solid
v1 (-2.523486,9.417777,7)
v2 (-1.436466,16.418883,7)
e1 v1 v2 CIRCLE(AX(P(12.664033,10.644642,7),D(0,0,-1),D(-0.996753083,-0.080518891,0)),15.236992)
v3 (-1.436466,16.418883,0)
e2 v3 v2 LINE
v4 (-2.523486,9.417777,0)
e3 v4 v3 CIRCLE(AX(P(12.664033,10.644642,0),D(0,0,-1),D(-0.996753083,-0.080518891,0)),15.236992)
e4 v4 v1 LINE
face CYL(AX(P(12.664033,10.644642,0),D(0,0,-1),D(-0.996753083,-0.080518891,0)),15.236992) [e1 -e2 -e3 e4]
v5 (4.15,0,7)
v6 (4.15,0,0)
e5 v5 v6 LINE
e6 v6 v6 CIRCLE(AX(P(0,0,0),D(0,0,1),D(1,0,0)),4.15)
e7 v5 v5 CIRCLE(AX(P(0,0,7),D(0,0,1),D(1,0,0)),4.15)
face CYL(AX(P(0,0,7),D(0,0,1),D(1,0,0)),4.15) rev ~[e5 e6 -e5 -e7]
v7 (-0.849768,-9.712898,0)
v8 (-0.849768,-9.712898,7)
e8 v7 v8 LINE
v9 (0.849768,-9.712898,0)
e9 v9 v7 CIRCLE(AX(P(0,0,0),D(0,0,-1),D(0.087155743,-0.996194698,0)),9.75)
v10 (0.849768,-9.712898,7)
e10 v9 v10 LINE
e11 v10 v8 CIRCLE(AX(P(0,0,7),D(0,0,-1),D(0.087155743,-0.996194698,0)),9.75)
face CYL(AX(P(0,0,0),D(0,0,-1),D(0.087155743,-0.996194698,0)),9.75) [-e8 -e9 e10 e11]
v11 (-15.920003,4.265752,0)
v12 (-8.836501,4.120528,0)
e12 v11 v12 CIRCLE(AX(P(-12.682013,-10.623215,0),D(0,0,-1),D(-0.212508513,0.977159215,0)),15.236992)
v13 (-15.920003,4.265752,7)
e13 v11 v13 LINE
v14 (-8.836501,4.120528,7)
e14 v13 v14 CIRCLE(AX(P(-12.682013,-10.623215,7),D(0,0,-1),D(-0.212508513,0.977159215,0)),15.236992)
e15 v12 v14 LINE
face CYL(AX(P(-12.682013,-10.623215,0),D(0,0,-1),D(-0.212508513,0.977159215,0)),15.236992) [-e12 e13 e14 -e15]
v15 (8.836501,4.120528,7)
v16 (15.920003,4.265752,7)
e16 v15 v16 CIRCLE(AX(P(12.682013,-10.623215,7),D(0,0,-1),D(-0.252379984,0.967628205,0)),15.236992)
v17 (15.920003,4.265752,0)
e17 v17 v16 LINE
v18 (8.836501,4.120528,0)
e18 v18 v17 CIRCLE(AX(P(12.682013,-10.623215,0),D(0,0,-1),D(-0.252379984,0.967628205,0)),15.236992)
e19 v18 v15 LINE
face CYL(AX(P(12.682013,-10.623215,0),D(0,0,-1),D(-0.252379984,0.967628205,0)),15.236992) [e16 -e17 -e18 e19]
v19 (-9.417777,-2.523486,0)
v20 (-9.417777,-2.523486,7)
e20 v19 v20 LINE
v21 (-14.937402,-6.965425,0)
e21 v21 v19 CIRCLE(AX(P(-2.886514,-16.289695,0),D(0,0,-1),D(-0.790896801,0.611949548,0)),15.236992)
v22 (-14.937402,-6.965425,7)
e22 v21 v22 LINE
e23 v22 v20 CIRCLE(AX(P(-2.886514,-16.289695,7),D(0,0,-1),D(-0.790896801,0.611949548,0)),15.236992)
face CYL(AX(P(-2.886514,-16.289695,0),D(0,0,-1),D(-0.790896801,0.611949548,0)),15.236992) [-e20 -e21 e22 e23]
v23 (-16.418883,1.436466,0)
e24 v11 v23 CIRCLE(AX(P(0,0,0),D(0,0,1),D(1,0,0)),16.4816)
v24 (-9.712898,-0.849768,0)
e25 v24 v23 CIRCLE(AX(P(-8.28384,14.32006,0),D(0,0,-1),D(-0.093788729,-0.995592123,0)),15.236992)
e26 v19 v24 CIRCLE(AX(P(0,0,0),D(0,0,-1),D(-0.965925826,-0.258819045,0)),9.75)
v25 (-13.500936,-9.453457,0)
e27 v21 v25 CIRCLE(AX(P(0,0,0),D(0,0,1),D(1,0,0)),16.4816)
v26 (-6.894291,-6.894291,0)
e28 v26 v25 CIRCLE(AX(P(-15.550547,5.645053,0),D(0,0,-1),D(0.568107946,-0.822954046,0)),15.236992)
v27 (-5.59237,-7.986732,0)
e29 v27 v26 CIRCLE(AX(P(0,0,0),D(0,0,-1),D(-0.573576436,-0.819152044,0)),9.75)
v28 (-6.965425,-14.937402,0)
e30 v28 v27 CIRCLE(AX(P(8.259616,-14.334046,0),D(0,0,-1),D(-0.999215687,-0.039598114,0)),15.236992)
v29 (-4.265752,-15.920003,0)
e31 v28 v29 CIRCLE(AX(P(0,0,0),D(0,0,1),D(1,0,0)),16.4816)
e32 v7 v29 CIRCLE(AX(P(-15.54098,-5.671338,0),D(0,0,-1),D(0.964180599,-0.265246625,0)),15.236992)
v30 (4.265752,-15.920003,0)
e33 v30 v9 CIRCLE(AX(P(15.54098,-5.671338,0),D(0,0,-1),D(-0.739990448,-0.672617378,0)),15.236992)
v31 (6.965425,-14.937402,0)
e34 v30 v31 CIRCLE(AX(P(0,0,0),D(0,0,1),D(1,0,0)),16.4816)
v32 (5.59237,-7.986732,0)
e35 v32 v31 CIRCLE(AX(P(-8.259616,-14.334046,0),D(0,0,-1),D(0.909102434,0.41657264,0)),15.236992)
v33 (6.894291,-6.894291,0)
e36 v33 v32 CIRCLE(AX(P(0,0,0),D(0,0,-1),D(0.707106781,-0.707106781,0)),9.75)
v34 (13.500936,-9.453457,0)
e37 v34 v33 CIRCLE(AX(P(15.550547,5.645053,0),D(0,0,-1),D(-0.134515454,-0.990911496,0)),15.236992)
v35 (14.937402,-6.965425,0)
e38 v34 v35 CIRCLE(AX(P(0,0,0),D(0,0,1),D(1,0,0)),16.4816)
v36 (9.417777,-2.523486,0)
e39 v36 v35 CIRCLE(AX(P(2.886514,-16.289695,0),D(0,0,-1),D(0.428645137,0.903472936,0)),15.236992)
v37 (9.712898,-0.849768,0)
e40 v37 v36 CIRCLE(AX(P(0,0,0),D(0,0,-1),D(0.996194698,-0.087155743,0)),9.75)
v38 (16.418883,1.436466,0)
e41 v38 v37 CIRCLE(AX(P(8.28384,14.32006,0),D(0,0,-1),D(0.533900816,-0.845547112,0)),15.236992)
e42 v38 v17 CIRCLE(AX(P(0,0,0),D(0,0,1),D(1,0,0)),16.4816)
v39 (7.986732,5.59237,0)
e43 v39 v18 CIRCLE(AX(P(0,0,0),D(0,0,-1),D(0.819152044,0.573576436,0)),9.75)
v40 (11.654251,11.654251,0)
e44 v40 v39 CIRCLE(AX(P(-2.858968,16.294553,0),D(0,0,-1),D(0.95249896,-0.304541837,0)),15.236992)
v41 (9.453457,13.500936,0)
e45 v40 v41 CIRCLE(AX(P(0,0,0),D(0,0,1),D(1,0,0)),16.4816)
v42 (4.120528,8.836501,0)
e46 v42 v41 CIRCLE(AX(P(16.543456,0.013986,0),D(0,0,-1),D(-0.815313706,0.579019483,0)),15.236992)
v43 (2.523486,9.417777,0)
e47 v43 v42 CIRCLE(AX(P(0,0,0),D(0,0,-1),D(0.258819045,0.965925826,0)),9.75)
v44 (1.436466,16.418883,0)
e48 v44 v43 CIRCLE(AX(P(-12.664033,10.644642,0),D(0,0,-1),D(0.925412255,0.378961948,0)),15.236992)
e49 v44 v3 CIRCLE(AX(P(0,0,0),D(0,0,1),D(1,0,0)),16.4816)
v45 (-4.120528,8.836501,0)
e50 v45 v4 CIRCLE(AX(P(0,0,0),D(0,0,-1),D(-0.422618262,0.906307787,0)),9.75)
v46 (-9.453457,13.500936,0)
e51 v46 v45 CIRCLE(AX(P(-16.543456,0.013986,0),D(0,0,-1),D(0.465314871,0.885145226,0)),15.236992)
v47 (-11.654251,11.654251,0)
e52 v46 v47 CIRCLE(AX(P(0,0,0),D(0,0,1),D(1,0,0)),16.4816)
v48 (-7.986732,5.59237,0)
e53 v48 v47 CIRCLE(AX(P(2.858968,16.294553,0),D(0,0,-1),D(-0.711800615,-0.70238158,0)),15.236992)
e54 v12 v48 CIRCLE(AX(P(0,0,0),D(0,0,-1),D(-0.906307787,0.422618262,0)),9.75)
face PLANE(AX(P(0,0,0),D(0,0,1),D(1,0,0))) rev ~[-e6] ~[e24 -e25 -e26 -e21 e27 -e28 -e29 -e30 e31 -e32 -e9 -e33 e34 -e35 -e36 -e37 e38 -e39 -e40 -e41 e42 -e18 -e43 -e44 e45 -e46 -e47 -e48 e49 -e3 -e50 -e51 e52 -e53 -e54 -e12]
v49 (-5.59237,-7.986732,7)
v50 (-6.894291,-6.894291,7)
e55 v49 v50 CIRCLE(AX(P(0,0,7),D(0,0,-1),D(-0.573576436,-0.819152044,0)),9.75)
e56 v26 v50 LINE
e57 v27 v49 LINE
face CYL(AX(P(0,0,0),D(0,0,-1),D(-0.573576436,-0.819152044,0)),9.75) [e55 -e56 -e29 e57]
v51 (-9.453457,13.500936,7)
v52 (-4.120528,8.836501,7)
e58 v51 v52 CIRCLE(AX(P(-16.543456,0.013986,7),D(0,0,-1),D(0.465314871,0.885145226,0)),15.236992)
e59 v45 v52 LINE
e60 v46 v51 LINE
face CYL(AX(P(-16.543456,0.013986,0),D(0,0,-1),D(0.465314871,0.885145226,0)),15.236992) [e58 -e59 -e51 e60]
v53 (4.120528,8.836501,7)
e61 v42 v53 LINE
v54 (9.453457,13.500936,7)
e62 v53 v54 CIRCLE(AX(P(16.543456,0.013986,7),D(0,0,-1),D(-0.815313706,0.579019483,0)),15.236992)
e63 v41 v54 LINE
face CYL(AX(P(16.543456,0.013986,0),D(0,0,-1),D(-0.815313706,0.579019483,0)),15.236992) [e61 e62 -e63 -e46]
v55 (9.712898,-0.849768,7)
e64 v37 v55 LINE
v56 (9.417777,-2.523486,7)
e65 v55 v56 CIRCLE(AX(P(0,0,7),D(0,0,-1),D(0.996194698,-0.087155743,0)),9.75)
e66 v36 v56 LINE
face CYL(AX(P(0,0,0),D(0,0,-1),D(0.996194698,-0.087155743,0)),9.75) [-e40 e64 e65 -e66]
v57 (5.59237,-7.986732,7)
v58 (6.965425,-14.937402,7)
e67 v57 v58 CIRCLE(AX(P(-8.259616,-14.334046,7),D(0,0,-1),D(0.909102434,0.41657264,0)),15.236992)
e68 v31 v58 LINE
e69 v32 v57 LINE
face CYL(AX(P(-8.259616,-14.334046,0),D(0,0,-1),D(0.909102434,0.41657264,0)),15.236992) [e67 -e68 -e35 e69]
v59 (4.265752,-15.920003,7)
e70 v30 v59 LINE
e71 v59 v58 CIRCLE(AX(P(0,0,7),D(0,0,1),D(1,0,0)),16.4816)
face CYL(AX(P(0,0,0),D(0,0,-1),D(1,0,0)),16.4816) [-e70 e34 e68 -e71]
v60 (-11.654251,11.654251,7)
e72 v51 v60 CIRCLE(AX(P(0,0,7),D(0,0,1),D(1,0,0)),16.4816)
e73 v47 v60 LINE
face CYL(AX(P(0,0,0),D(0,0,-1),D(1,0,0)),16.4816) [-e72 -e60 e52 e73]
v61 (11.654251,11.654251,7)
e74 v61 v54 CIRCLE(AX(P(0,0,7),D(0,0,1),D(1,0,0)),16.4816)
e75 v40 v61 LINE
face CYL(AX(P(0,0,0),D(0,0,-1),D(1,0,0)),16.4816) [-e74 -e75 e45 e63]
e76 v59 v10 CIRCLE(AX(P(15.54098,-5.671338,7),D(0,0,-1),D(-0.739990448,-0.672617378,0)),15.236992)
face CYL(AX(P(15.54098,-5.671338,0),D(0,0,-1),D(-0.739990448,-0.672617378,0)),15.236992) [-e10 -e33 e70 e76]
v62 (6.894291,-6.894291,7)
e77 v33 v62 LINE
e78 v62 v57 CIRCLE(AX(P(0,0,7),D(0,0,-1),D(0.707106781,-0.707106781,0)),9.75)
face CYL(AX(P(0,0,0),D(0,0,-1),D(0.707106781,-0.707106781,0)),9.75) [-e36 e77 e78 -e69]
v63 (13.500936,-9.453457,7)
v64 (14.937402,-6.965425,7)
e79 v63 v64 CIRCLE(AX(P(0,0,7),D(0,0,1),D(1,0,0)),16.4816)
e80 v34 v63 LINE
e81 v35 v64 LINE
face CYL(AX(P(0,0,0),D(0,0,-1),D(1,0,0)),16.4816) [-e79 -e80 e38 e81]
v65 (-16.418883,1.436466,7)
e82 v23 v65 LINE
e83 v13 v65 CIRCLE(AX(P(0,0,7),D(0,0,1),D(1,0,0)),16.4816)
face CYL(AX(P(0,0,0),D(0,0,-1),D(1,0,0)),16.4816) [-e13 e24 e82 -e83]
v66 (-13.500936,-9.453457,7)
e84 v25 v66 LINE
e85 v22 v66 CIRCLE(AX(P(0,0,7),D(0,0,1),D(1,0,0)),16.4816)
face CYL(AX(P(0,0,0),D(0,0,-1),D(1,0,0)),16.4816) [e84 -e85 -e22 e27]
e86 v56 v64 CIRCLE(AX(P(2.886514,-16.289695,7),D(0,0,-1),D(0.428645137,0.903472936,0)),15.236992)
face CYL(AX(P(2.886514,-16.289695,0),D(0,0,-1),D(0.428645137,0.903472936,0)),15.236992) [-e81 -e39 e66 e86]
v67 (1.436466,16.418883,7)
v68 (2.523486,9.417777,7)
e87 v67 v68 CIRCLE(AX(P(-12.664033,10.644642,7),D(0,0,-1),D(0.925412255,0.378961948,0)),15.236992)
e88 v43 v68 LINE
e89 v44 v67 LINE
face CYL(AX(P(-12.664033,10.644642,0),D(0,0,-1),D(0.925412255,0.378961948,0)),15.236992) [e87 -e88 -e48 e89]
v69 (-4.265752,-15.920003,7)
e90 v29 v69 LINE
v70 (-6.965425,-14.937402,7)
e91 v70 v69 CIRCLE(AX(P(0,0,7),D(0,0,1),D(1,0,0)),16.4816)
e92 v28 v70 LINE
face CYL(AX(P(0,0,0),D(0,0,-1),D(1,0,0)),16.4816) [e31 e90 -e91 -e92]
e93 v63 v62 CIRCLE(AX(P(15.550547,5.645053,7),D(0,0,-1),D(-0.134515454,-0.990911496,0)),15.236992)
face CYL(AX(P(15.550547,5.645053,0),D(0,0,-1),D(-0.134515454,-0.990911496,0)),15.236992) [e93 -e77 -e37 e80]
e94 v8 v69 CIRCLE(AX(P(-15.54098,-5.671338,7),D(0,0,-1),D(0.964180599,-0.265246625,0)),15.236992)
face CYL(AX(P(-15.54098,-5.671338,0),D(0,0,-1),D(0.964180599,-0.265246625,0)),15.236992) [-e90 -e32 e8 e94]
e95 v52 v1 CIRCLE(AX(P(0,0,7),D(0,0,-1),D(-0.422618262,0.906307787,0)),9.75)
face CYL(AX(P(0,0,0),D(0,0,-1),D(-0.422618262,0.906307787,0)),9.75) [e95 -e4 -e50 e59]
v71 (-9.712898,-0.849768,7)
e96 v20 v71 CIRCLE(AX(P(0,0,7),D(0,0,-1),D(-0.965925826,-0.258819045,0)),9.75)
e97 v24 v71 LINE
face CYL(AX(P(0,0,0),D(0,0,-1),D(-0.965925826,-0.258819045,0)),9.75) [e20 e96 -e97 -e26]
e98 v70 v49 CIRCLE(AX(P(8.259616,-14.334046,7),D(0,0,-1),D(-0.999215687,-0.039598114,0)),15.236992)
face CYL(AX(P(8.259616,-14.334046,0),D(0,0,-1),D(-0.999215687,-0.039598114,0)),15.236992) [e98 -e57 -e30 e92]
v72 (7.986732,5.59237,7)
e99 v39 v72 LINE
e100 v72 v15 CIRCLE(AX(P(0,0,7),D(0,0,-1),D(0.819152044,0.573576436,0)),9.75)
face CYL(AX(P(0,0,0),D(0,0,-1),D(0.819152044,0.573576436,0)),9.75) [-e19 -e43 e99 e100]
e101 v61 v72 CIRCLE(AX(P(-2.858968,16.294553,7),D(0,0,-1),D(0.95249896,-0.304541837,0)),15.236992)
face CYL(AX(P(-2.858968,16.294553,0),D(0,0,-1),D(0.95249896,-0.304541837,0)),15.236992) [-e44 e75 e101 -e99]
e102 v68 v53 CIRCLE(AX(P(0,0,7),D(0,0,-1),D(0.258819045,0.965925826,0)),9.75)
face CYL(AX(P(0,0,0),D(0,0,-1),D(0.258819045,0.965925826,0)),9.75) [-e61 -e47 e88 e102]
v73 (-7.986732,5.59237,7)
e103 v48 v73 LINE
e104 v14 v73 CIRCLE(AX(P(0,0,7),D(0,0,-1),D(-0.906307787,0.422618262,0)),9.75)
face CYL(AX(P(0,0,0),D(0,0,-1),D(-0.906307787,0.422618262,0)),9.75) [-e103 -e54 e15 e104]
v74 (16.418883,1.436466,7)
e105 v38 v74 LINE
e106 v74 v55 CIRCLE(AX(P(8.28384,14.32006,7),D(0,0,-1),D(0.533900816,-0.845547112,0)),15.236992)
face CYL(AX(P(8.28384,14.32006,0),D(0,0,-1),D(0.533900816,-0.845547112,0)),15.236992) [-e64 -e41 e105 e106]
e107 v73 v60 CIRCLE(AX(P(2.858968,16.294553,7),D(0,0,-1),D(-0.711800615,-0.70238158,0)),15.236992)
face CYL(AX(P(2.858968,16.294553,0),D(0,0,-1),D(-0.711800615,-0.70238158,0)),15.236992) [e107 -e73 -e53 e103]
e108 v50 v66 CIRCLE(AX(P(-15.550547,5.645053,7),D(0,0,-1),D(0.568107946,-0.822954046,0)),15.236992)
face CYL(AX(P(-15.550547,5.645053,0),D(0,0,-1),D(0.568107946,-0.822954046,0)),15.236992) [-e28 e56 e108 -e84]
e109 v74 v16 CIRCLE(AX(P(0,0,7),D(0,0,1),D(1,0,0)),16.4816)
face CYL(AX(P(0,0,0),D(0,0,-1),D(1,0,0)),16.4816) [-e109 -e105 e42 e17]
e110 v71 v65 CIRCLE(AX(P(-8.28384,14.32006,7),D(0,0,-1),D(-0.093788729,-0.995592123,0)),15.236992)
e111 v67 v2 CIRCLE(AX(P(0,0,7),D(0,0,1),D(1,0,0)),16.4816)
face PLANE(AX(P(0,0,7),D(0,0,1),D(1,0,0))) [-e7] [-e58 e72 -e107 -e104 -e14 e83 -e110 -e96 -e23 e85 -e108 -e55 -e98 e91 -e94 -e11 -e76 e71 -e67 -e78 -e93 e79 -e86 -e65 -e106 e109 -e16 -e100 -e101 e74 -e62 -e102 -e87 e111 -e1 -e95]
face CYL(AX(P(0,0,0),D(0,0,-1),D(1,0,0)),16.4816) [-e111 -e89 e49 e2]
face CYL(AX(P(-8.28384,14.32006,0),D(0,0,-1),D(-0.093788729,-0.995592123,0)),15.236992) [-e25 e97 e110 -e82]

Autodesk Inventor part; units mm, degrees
sketch "Sketch1" plane through (0, 0, 0) normal (0, 0, 1) x (1, 0, 0)
  circle A0 centre (0, 0) radius 16.4816
  dimension "d0" = 32.9631
extrude "Extrusion1" add sketch "Sketch1" along normal blind 7
ref_plane "Work Plane2" through (0, 0, 3.5) normal (0, 0, 1) x (1, 0, 0)
sketch "Sketch2" plane through (0, 0, 0) normal (0, 0, -1) x (-1, 0, 0)
  circle A0 centre (0, 0) radius 16.4816 projected
  circle A1 centre (0, 0) radius 13.5
  dimension "d3" = 27
surface extrude "Pitch Diameter" sketch "Sketch2" against normal through all shown no curves A1
ref_plane "Work Plane8" through (0, 0, 0) normal (0.9396926, 0.3420201, 0) x (0, 0, 1)
ref_plane "Work Plane9" through (0, 0, 0) normal (1, 0, 0) x (0, 1, 0)
spur gear teeth "Spur Gear" teeth 9 pitch diameter 27 tip diameter 32.9632 root diameter 19.5 face width 7 start plane through (0, 0, 0) normal (0, 0, -1) x (-1, 0, 0)
sketch "Sketch3" plane through (0, 0, 7) normal (0, 0, 1) x (1, 0, 0)
  point P0 (0, 0)
sketch "Sketch4" plane through (0, 0, 7) normal (0, 0, 1) x (1, 0, 0)
  circle A0 centre (0, 0) radius 4.15
  dimension "d49" = 8.3
extrude "Extrusion2" cut sketch "Sketch4" against normal blind 10
equation "\"d0\" = da_da"
equation "\"d1\" = da_b"
equation "\"d3\" = da_d"
equation "\"da_da\" = 32.963154"
equation "\"da_b\" = 7"
equation "\"da_d\" = 27"
properties part number "Spur Gear1" material "Steel"
